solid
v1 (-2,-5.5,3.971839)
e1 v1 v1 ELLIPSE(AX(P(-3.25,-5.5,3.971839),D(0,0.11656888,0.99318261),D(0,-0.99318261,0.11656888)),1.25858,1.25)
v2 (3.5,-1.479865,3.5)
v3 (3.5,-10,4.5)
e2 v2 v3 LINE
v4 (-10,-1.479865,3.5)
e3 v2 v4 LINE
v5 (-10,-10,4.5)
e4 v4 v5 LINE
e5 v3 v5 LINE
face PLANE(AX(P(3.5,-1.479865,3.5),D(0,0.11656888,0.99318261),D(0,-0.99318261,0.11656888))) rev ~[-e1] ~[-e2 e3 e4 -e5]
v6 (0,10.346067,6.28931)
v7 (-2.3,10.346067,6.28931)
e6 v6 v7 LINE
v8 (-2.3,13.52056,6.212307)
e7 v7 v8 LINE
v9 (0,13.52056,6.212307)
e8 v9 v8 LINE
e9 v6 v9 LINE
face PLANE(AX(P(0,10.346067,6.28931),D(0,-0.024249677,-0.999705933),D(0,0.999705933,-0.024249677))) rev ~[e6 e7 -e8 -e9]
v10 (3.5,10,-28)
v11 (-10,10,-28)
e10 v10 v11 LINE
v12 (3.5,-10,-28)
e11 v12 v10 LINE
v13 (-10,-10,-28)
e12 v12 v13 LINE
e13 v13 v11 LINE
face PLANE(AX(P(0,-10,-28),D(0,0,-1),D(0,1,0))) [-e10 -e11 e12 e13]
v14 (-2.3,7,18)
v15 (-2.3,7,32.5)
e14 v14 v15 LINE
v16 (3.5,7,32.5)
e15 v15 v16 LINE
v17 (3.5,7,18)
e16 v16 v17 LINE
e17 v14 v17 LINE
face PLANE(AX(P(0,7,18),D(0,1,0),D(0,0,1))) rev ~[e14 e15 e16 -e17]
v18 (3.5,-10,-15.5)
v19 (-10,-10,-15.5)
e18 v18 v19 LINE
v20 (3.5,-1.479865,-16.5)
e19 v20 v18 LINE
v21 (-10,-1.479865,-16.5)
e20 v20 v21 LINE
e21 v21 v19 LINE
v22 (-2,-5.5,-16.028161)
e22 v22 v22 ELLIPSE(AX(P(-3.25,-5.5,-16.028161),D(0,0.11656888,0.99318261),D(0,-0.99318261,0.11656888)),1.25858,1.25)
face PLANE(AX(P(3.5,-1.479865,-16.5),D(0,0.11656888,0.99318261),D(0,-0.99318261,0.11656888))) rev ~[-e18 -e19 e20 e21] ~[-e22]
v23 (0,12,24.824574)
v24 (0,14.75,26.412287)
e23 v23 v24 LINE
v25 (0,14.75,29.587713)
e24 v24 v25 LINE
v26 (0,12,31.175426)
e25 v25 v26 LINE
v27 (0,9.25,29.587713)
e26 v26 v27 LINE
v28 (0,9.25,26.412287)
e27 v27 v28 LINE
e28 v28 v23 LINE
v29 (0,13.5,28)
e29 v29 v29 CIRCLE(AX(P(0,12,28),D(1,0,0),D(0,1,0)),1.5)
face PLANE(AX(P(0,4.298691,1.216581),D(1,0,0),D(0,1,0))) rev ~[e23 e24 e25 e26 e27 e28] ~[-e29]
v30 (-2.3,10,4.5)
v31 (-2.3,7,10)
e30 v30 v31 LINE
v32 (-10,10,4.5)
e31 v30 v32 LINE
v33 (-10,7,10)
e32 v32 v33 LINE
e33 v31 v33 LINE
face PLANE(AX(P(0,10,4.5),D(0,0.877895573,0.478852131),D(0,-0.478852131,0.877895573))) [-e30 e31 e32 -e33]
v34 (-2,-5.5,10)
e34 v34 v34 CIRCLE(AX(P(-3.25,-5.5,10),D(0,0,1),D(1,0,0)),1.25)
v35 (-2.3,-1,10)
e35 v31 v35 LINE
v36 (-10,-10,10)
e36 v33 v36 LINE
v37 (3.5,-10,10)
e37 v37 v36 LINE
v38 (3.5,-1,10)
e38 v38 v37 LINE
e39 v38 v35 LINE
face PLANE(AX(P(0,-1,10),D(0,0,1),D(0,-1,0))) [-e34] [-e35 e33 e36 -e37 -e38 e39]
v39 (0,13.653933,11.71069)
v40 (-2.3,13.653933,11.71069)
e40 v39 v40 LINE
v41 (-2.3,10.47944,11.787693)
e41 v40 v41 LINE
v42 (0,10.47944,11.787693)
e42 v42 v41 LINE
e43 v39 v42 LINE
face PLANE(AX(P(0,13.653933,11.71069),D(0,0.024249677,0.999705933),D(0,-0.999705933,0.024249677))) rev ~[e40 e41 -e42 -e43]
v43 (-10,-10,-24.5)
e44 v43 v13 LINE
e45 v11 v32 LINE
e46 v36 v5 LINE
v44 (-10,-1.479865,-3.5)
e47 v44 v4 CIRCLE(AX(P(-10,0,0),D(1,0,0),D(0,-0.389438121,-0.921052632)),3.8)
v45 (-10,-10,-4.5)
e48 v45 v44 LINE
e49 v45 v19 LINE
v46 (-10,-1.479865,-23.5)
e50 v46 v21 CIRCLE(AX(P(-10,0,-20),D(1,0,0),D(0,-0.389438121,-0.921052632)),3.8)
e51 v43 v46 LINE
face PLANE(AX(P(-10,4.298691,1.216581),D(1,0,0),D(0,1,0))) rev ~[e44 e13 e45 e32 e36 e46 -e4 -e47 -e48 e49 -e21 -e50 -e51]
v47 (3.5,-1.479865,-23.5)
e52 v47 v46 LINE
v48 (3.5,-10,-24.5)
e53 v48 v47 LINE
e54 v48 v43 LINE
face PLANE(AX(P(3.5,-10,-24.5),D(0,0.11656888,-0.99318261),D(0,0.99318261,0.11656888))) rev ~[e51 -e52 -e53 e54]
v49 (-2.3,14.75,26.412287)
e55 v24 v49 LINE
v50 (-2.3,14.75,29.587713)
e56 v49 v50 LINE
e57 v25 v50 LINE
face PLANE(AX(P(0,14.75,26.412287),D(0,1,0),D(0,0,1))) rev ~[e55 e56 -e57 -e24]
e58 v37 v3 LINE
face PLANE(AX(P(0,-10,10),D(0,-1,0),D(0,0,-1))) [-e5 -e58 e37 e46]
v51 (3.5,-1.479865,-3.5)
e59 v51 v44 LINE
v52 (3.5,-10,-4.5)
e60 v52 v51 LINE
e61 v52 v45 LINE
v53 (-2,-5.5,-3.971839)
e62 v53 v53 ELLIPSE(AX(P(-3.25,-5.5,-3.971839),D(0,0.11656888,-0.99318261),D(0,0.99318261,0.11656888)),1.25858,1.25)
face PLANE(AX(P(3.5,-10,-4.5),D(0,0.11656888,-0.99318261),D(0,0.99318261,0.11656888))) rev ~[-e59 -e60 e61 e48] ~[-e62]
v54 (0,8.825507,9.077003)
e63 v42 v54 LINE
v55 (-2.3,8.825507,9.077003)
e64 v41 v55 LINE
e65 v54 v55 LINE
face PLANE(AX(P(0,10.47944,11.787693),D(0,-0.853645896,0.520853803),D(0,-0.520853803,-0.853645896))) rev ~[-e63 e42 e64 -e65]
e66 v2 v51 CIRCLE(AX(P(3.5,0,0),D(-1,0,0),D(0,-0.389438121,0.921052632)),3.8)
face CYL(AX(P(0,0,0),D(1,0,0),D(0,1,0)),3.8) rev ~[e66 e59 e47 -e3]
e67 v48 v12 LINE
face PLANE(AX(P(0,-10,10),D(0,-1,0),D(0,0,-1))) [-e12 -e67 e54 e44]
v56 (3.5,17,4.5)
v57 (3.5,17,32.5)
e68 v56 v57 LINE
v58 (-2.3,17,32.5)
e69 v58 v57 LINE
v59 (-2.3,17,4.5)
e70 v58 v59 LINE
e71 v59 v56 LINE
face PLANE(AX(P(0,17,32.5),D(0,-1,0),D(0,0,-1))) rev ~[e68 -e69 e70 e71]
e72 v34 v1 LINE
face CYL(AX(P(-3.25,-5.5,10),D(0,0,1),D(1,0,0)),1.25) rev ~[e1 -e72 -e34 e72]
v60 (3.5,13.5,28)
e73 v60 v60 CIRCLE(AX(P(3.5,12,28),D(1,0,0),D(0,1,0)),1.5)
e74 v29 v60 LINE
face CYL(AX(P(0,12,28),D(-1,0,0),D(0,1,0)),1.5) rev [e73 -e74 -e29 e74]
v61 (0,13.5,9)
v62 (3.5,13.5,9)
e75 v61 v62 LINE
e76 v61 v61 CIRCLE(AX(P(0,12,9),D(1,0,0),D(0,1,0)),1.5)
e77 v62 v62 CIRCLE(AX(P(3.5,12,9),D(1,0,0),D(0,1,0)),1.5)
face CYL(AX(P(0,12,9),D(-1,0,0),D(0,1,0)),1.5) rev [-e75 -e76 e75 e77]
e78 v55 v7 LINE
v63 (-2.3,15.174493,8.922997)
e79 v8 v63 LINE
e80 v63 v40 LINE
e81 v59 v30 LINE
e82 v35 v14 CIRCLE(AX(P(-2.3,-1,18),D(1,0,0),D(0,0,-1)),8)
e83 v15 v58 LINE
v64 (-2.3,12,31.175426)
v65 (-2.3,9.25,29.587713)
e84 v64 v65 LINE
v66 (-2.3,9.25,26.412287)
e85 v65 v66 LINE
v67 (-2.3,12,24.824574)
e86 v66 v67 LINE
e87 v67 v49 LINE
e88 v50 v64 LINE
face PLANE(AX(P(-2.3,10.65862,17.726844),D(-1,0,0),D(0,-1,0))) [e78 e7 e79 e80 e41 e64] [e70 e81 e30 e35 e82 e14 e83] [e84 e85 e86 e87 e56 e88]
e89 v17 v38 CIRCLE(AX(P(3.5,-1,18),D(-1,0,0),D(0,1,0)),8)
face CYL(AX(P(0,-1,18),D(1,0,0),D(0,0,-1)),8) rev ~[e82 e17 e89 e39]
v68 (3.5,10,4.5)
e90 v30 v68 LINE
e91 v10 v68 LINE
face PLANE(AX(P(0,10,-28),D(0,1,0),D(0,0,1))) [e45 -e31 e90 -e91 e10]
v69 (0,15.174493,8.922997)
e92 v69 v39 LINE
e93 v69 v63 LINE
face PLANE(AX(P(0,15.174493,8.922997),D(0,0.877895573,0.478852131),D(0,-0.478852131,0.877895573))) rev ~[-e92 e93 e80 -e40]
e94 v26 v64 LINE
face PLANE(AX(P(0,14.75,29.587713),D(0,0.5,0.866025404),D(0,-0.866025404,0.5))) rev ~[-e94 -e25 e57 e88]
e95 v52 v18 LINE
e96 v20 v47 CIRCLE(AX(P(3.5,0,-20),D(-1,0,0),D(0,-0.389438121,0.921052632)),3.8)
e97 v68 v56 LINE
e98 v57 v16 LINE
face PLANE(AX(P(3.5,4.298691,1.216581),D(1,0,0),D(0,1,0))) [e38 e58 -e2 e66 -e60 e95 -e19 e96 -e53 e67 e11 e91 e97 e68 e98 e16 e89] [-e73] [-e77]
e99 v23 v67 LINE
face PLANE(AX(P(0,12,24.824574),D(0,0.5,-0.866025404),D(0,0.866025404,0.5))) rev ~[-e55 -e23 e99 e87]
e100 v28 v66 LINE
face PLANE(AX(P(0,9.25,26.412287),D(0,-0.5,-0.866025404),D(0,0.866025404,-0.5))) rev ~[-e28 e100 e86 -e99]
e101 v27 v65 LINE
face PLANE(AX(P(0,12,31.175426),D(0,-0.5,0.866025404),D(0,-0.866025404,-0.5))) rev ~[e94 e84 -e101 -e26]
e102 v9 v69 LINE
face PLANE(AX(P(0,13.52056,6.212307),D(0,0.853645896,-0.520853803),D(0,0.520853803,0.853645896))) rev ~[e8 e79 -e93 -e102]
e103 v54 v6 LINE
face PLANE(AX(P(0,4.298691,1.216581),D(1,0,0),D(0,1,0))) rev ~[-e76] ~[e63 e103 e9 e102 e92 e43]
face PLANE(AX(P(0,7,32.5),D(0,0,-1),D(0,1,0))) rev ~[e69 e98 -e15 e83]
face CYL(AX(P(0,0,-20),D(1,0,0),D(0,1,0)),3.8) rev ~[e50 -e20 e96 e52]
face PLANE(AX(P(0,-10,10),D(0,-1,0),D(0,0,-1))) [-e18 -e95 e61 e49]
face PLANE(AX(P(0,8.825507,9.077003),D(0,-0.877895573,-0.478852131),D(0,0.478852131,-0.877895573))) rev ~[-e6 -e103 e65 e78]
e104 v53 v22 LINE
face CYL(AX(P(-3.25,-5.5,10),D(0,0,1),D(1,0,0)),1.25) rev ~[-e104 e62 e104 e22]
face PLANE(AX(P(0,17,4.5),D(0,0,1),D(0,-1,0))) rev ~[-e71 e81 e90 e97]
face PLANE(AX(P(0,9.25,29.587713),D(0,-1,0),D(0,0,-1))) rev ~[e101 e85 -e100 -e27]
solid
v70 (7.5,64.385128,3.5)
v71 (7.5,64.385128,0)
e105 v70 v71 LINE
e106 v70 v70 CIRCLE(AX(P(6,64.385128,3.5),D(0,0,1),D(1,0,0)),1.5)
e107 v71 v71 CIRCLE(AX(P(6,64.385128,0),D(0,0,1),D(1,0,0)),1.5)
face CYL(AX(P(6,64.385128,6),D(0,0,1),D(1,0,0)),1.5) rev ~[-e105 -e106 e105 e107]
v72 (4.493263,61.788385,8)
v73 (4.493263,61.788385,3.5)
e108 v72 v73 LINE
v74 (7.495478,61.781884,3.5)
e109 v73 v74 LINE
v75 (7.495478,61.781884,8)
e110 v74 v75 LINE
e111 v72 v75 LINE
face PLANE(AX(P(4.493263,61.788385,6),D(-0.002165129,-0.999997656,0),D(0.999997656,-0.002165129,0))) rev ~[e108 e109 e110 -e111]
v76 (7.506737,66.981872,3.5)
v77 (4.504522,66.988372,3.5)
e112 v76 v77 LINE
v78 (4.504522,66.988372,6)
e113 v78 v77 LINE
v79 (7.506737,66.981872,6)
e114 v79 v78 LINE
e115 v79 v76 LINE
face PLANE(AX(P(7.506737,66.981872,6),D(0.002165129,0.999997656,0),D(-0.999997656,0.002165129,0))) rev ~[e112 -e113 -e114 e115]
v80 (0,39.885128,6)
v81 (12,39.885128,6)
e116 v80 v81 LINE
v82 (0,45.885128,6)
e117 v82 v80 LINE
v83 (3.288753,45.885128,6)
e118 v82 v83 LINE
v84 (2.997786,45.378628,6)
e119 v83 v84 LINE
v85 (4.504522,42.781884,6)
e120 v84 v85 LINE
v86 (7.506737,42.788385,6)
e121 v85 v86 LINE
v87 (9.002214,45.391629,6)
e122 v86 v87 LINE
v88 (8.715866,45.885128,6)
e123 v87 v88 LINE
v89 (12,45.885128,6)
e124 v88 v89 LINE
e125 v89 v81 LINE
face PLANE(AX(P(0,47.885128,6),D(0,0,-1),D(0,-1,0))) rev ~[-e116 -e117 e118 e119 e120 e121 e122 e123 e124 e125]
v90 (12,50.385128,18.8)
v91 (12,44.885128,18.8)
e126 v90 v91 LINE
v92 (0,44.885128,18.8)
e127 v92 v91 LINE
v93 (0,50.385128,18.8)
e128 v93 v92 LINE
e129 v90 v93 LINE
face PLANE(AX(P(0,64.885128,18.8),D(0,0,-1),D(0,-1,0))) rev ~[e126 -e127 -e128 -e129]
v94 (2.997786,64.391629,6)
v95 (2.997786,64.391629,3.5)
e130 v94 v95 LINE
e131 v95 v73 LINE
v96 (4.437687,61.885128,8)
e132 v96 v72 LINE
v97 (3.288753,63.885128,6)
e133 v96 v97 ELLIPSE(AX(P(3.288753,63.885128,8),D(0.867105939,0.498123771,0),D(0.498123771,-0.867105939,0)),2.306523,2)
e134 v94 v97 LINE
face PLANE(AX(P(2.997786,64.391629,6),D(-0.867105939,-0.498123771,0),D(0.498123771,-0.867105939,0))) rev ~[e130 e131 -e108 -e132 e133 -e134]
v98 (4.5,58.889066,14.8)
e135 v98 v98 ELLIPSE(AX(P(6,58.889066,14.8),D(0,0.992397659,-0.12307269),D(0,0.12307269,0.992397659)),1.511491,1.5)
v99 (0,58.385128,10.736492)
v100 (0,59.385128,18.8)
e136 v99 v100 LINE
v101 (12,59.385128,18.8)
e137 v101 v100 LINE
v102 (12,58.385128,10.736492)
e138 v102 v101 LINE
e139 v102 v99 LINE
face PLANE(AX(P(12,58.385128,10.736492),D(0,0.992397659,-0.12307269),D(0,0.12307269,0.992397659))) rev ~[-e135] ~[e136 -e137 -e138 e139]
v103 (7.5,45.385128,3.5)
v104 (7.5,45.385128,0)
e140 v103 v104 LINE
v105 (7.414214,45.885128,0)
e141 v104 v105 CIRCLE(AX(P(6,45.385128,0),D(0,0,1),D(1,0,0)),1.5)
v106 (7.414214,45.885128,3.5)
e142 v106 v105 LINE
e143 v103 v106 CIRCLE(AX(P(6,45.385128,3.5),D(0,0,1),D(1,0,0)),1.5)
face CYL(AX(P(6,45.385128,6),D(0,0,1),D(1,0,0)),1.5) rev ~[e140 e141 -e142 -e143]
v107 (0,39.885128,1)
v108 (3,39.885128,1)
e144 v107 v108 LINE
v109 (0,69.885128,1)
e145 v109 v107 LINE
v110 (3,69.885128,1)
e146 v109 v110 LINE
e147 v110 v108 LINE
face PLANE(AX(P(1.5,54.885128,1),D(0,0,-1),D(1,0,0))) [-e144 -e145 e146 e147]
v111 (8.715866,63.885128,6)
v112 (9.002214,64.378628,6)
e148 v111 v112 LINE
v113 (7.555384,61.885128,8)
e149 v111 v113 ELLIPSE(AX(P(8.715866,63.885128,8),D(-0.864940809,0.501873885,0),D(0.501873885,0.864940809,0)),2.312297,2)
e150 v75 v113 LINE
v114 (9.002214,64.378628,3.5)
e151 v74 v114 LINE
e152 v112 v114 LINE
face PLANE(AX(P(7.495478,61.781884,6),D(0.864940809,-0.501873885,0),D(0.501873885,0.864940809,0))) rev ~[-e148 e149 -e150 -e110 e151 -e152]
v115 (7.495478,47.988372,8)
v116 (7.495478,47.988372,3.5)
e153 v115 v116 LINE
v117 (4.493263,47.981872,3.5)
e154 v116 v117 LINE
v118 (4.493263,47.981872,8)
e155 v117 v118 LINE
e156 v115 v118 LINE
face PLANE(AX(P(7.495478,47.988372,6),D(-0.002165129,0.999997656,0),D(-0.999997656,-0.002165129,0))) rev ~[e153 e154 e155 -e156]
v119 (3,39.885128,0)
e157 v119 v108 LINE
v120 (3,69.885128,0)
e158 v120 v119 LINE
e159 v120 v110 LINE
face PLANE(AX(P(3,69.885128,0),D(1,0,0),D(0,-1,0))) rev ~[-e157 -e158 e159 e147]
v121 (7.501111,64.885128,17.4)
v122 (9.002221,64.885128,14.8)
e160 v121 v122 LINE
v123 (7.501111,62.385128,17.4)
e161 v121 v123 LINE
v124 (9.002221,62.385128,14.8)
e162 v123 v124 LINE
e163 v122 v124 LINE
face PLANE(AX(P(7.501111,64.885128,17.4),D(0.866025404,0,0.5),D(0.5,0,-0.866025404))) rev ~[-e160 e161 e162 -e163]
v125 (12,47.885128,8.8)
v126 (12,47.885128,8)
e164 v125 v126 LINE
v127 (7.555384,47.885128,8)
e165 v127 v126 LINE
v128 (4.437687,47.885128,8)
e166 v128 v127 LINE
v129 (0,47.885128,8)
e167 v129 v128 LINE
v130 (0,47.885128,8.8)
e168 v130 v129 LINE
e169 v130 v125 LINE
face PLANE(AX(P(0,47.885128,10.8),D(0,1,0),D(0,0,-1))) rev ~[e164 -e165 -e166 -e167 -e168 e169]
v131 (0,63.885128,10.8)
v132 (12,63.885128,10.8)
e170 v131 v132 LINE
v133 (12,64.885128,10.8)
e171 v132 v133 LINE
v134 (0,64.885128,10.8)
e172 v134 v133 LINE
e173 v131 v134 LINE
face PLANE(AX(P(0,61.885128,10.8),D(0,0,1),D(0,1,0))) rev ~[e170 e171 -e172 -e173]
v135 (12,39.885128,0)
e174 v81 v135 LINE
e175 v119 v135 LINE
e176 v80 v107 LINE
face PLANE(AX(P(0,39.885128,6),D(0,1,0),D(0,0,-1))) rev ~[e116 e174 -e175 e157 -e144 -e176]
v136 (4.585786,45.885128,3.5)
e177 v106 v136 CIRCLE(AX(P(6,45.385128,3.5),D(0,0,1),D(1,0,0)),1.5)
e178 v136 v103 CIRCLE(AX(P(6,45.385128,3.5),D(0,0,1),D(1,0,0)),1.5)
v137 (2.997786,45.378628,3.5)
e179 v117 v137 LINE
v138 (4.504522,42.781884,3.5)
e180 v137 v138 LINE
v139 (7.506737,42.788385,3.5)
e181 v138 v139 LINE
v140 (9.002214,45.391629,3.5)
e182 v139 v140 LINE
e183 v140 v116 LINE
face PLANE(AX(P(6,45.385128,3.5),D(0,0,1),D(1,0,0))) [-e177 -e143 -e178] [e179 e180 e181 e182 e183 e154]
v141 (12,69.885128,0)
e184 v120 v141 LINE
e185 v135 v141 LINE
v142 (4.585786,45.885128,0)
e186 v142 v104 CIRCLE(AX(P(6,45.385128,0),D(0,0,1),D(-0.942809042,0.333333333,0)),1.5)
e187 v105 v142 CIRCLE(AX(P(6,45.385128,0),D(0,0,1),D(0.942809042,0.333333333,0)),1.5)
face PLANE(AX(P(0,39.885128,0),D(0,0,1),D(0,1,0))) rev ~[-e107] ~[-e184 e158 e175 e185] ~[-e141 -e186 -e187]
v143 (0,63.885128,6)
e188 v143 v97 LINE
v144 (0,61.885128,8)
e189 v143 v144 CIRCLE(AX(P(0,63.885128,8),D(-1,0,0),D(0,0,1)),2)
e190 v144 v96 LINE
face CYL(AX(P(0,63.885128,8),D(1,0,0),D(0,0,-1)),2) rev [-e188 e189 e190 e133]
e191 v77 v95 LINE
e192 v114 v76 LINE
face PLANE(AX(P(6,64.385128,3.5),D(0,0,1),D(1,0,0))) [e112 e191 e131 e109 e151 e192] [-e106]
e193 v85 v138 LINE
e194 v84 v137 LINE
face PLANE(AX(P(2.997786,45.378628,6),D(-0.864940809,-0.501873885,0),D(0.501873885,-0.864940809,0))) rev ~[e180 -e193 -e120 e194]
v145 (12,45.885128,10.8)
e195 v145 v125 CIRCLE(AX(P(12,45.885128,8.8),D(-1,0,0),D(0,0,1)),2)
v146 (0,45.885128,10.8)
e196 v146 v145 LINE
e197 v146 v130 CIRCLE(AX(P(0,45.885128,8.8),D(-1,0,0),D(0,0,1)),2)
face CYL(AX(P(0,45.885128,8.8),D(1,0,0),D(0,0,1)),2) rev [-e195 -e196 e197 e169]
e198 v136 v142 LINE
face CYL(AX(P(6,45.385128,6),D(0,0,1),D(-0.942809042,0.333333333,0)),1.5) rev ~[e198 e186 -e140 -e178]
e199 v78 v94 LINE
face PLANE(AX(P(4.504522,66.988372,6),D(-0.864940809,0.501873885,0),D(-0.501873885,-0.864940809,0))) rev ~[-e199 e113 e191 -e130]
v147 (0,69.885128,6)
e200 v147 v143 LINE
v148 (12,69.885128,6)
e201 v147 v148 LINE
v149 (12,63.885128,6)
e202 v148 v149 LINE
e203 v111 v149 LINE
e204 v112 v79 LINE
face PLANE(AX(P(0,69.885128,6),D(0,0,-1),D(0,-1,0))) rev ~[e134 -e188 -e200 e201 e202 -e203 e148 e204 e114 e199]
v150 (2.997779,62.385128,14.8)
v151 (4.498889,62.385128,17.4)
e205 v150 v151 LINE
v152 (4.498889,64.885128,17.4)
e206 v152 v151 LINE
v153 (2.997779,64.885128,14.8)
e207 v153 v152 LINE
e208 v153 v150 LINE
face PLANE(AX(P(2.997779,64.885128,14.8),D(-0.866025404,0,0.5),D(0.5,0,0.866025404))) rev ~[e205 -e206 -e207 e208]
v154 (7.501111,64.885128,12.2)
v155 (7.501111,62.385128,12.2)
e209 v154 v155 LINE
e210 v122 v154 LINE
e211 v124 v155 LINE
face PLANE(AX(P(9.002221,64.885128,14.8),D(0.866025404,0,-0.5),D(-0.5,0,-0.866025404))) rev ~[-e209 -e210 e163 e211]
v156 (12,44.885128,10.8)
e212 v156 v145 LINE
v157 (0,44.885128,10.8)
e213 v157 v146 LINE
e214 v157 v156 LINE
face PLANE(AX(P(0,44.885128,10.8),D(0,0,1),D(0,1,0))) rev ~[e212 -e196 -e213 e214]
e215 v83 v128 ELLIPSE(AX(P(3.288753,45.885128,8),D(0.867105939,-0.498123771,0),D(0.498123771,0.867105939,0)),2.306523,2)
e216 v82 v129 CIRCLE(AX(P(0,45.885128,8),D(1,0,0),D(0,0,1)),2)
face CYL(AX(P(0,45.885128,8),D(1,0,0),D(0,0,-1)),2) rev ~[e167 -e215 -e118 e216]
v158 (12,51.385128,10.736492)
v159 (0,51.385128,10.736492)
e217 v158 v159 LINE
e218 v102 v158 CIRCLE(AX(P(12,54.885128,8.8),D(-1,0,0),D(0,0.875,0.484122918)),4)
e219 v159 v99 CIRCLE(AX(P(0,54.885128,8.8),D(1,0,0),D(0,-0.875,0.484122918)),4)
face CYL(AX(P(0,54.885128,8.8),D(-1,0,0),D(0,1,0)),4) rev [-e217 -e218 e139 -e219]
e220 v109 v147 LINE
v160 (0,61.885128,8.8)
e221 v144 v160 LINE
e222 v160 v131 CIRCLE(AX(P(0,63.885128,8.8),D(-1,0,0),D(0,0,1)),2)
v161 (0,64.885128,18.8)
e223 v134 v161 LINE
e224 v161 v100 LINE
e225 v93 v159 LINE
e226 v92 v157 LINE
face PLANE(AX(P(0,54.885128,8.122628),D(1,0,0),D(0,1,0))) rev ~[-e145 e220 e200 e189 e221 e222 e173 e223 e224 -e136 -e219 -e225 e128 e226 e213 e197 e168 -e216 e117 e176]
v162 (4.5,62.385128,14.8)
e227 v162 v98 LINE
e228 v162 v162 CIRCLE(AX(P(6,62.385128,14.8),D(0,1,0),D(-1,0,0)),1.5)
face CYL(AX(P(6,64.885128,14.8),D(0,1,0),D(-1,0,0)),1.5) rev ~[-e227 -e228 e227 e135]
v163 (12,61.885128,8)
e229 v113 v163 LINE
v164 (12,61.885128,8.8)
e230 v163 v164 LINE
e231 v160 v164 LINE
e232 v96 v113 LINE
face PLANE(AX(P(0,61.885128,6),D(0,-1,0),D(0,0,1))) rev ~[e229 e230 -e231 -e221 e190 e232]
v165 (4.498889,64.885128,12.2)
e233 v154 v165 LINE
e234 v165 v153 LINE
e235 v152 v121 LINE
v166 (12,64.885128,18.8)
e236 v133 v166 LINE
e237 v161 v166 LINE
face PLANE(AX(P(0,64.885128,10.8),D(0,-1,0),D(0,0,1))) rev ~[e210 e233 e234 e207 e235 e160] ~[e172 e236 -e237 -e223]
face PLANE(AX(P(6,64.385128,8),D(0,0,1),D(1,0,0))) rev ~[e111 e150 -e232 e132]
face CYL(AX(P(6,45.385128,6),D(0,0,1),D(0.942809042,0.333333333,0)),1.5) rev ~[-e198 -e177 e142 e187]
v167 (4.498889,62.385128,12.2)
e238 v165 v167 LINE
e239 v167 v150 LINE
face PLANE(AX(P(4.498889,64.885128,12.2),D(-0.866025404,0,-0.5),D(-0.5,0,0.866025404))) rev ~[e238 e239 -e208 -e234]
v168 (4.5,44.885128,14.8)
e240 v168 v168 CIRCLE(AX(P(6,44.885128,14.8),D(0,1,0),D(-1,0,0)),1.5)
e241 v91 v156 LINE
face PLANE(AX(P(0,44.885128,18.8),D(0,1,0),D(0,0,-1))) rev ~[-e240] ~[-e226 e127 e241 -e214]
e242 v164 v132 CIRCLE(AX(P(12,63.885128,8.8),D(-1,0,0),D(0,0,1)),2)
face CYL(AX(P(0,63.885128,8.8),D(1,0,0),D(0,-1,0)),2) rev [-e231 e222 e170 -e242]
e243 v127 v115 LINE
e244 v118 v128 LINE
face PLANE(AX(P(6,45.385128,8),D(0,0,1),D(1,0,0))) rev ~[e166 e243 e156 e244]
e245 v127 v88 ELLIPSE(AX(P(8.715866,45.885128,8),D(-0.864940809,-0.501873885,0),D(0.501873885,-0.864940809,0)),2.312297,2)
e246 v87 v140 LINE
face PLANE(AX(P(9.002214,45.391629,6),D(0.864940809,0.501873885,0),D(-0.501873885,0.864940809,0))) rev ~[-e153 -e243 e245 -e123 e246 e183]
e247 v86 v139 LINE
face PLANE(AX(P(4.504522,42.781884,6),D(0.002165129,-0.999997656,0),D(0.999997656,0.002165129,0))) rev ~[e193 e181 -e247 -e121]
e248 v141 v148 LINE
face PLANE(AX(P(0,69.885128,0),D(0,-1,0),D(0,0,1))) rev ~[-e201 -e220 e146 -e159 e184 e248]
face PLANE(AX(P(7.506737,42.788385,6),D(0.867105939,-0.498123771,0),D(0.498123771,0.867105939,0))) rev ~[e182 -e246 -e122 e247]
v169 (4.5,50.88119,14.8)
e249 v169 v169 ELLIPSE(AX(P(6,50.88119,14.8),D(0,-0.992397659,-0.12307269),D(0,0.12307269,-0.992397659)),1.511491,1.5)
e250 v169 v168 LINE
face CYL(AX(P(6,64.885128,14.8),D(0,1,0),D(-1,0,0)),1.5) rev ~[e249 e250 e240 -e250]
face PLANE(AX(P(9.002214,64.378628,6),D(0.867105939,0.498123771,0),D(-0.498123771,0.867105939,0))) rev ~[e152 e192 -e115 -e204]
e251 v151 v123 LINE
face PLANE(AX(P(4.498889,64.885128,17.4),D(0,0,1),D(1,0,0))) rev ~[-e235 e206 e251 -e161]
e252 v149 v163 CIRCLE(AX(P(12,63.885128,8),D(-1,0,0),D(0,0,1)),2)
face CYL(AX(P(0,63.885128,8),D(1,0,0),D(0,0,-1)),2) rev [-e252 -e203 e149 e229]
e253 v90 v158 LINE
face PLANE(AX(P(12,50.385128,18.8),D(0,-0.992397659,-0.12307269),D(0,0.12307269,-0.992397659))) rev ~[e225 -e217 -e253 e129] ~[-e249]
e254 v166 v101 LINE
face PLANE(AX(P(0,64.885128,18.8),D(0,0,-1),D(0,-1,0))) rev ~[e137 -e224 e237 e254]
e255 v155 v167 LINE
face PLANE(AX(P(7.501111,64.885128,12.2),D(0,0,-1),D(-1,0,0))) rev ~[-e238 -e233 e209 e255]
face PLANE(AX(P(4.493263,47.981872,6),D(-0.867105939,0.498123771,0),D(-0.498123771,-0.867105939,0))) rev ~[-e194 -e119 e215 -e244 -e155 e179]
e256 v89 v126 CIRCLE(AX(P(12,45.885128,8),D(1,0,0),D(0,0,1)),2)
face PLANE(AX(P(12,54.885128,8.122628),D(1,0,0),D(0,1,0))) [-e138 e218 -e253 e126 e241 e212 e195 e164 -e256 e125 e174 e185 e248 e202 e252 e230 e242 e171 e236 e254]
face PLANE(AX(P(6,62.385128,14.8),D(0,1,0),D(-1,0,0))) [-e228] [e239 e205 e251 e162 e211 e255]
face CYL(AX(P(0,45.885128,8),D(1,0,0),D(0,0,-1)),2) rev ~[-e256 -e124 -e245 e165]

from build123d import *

# Parameters (mm, degrees)
F0_R           = 3.8
F0_R_2         = 1.5
F1_DEPTH       = 3.5
F3_DEPTH       = 2.3
F4_DEPTH       = 10
F6_DEPTH       = 13.501
F7_R           = 1.25
F8_DEPTH       = 30
F9_R           = 4
F10_DEPTH      = 12
F11_R          = 2
F12_R          = 1.5
F13_DEPTH      = 34.001
F13_DEPTH_BACK = 3
F14_DEPTH      = 2.5
F14_DEPTH_BACK = 2
F16_DEPTH      = 22.001
F17_R          = 1.5
F18_DEPTH      = 74.8861283789
F19_DEPTH      = 2.5
F20_R          = 2
F21_W          = 3
F21_H          = 30
F22_DEPTH      = 1


with BuildPart() as f1:
    # F0 (on Right) → F1 (new body)
    with BuildSketch(Plane.YZ):
        with BuildLine():
            Line((17, 32.5), (7, 32.5))
            Line((7, 32.5), (7, 18))
            ThreePointArc((7, 18), (4.6568542495, 12.3431457505), (-1, 10))
            Line((-1, 10), (-10, 10))
            Line((-10, 10), (-10, -28))
            Line((-10, -28), (10, -28))
            Line((10, -28), (10, 4.5))
            Line((10, 4.5), (17, 4.5))
            Line((17, 4.5), (17, 32.5))
        make_face()
        with Locations((0, -20)):
            Circle(F0_R, mode=Mode.SUBTRACT)
        Circle(F0_R, mode=Mode.SUBTRACT)
        with Locations((12, 9)):
            Circle(F0_R_2, mode=Mode.SUBTRACT)
        with Locations((12, 28)):
            Circle(F0_R_2, mode=Mode.SUBTRACT)
    extrude(amount=F1_DEPTH)

    # F2 (on face) → F3 (join)
    with BuildSketch(Plane(origin=(0, 0, 0), x_dir=(0, -1, 0), z_dir=(-1, 0, 0))):
        with BuildLine():
            Line((-17, 4.5), (-10, 4.5))
            Line((-10, 4.5), (-7, 10))
            Line((-7, 10), (1, 10))
            ThreePointArc((1, 10), (-4.6568542495, 12.3431457505), (-7, 18))
            Line((-7, 18), (-7, 32.5))
            Line((-7, 32.5), (-17, 32.5))
            Line((-17, 32.5), (-17, 4.5))
        make_face()
        Polygon((-10.479440264, 11.7876928494), (-8.8255073065, 9.0770030653), (-10.3460670425, 6.2893102159), (-13.520559736, 6.2123071506), (-15.1744926935, 8.9229969347), (-13.6539329575, 11.7106897841), align=None, mode=Mode.SUBTRACT)
        Polygon((-12, 31.1754264805), (-9.25, 29.5877132403), (-9.25, 26.4122867597), (-12, 24.8245735195), (-14.75, 26.4122867597), (-14.75, 29.5877132403), align=None, mode=Mode.SUBTRACT)
    extrude(amount=F3_DEPTH)

    # F4 (add): a face of the model
    f4_faces = [f1.faces().sort_by_distance(p)[0] for p in [
        (0, -0.112326268, -9.0769957675),
    ]]
    extrude(f4_faces, amount=F4_DEPTH)

    # F5 (on face) → F6 (cut, through all)
    with BuildSketch(Plane.YZ.offset(3.5)):
        with BuildLine():
            ThreePointArc((-1.4798648587, -3.5), (2.0995849039, -3.1672927291), (3.8, 0))
            ThreePointArc((3.8, 0), (2.0995849039, 3.1672927291), (-1.4798648587, 3.5))
            Line((-1.4798648587, 3.5), (-1.4798648587, -3.5))
        make_face()
        with BuildLine():
            Line((-1.4798648587, -3.5), (-1.4798648587, 3.5))
            ThreePointArc((-1.4798648587, 3.5), (-3.8, 0), (-1.4798648587, -3.5))
        make_face()
        with BuildLine():
            ThreePointArc((-1.4798648587, -3.5), (-3.8, 0), (-1.4798648587, 3.5))
            Line((-1.4798648587, 3.5), (-10, 4.5))
            Line((-10, 4.5), (-10, -4.5))
            Line((-10, -4.5), (-1.4798648587, -3.5))
        make_face()
        with BuildLine():
            ThreePointArc((-1.4798648587, -23.5), (2.0995849039, -23.1672927291), (3.8, -20))
            ThreePointArc((3.8, -20), (2.0995849039, -16.8327072709), (-1.4798648587, -16.5))
            Line((-1.4798648587, -16.5), (-1.4798648587, -23.5))
        make_face()
        with BuildLine():
            Line((-1.4798648587, -23.5), (-1.4798648587, -16.5))
            ThreePointArc((-1.4798648587, -16.5), (-3.8, -20), (-1.4798648587, -23.5))
        make_face()
        with BuildLine():
            ThreePointArc((-1.4798648587, -23.5), (-3.8, -20), (-1.4798648587, -16.5))
            Line((-1.4798648587, -16.5), (-10, -15.5))
            Line((-10, -15.5), (-10, -24.5))
            Line((-10, -24.5), (-1.4798648587, -23.5))
        make_face()
    extrude(amount=-F6_DEPTH, mode=Mode.SUBTRACT)

    # F7 (on face) → F8 (cut)
    with BuildSketch(Plane.XY.offset(10)):
        with Locations((-3.25, -5.5)):
            Circle(F7_R)
    extrude(amount=-F8_DEPTH, mode=Mode.SUBTRACT)


with BuildPart() as f10:
    # F9 (on Right) → F10 (new body)
    with BuildSketch(Plane.YZ):
        Polygon((39.8851283789, 0), (69.8851283789, 0), (69.8851283789, 6), (61.8851283789, 6), (61.8851283789, 10.8), (64.8851283789, 10.8), (64.8851283789, 18.8), (44.8851283789, 18.8), (44.8851283789, 10.8), (47.8851283789, 10.8), (47.8851283789, 6), (39.8851283789, 6), align=None)
        with Locations((54.8851283789, 8.8)):
            Circle(F9_R, mode=Mode.SUBTRACT)
    extrude(amount=F10_DEPTH)

    # F11
    f11_edges = [f10.edges().sort_by_distance(p)[0] for p in [
        (6, 47.885128, 6),
        (6, 61.885128, 6),
    ]]
    fillet(f11_edges, radius=F11_R)

    # F12 (on face) → F13 (cut, two sides)
    with BuildSketch(Plane.XY.offset(6)) as f13_sk:
        with BuildLine():
            Line((4.5857864376, 45.8851283789), (7.4142135624, 45.8851283789))
            ThreePointArc((7.4142135624, 45.8851283789), (6, 46.8851283789), (4.5857864376, 45.8851283789))
        make_face()
        with BuildLine():
            ThreePointArc((4.5857864376, 45.8851283789), (5.7463470319, 43.9067305394), (7.5, 45.3851283789))
            ThreePointArc((7.5, 45.3851283789), (7.4783978395, 45.638781347), (7.4142135624, 45.8851283789))
            Line((7.4142135624, 45.8851283789), (4.5857864376, 45.8851283789))
        make_face()
        with Locations((6, 64.3851283789)):
            Circle(F12_R)
    extrude(amount=-F13_DEPTH, mode=Mode.SUBTRACT)
    extrude(f13_sk.sketch, amount=F13_DEPTH_BACK, mode=Mode.SUBTRACT)

    # F12 (on face) → F14 (cut, two sides)
    with BuildSketch(Plane.XY.offset(6)) as f14_sk:
        Polygon((7.5067365177, 42.7883845718), (9.0022143629, 45.3916285765), (7.4954778452, 47.9883723835), (4.4932634823, 47.9818721859), (2.9977856371, 45.3786281813), (4.5045221548, 42.7818843742), align=None)
        with Locations((6, 45.3851283789)):
            Circle(F12_R, mode=Mode.SUBTRACT)
        Polygon((4.5045221548, 66.9883723835), (2.9977856371, 64.3916285765), (4.4932634823, 61.7883845718), (7.4954778452, 61.7818843742), (9.0022143629, 64.3786281813), (7.5067365177, 66.9818721859), align=None)
        with Locations((6, 64.3851283789)):
            Circle(F12_R, mode=Mode.SUBTRACT)
    extrude(amount=-F14_DEPTH, mode=Mode.SUBTRACT)
    extrude(f14_sk.sketch, amount=F14_DEPTH_BACK, mode=Mode.SUBTRACT)

    # F15 (on face) → F16 (cut, through all)
    with BuildSketch(Plane.YZ.offset(12)):
        with BuildLine():
            ThreePointArc((51.3851283789, 10.7364916731), (54.8851283789, 12.8), (58.3851283789, 10.7364916731))
            Line((58.3851283789, 10.7364916731), (59.3851283789, 18.8))
            Line((59.3851283789, 18.8), (50.3851283789, 18.8))
            Line((50.3851283789, 18.8), (51.3851283789, 10.7364916731))
        make_face()
    extrude(amount=-F16_DEPTH, mode=Mode.SUBTRACT)

    # F17 (on face) → F18 (cut, through all)
    with BuildSketch(Plane(origin=(0, 64.8851283789, 0), x_dir=(-1, 0, 0), z_dir=(0, 1, 0))):
        with Locations((-6, 14.8)):
            Circle(F17_R)
    extrude(amount=-F18_DEPTH, mode=Mode.SUBTRACT)

    # F17 (on face) → F19 (cut)
    with BuildSketch(Plane(origin=(0, 64.8851283789, 0), x_dir=(-1, 0, 0), z_dir=(0, 1, 0))):
        Polygon((-4.4988893001, 17.4), (-7.5011106999, 17.4), (-9.0022213998, 14.8), (-7.5011106999, 12.2), (-4.4988893001, 12.2), (-2.9977786002, 14.8), align=None)
        with Locations((-6, 14.8)):
            Circle(F17_R, mode=Mode.SUBTRACT)
    extrude(amount=-F19_DEPTH, mode=Mode.SUBTRACT)

    # F20
    f20_edges = [f10.edges().sort_by_distance(p)[0] for p in [
        (6, 61.885128, 10.8),
        (6, 47.885128, 10.8),
    ]]
    fillet(f20_edges, radius=F20_R)

    # F21 (on face) → F22 (cut)
    with BuildSketch(Plane(origin=(0, 0, 0), x_dir=(1, 0, 0), z_dir=(0, 0, -1))):
        with Locations((1.5, -54.8851283789)):
            Rectangle(F21_W, F21_H)
    extrude(amount=-F22_DEPTH, mode=Mode.SUBTRACT)


solid = Compound([f1.part, f10.part])
